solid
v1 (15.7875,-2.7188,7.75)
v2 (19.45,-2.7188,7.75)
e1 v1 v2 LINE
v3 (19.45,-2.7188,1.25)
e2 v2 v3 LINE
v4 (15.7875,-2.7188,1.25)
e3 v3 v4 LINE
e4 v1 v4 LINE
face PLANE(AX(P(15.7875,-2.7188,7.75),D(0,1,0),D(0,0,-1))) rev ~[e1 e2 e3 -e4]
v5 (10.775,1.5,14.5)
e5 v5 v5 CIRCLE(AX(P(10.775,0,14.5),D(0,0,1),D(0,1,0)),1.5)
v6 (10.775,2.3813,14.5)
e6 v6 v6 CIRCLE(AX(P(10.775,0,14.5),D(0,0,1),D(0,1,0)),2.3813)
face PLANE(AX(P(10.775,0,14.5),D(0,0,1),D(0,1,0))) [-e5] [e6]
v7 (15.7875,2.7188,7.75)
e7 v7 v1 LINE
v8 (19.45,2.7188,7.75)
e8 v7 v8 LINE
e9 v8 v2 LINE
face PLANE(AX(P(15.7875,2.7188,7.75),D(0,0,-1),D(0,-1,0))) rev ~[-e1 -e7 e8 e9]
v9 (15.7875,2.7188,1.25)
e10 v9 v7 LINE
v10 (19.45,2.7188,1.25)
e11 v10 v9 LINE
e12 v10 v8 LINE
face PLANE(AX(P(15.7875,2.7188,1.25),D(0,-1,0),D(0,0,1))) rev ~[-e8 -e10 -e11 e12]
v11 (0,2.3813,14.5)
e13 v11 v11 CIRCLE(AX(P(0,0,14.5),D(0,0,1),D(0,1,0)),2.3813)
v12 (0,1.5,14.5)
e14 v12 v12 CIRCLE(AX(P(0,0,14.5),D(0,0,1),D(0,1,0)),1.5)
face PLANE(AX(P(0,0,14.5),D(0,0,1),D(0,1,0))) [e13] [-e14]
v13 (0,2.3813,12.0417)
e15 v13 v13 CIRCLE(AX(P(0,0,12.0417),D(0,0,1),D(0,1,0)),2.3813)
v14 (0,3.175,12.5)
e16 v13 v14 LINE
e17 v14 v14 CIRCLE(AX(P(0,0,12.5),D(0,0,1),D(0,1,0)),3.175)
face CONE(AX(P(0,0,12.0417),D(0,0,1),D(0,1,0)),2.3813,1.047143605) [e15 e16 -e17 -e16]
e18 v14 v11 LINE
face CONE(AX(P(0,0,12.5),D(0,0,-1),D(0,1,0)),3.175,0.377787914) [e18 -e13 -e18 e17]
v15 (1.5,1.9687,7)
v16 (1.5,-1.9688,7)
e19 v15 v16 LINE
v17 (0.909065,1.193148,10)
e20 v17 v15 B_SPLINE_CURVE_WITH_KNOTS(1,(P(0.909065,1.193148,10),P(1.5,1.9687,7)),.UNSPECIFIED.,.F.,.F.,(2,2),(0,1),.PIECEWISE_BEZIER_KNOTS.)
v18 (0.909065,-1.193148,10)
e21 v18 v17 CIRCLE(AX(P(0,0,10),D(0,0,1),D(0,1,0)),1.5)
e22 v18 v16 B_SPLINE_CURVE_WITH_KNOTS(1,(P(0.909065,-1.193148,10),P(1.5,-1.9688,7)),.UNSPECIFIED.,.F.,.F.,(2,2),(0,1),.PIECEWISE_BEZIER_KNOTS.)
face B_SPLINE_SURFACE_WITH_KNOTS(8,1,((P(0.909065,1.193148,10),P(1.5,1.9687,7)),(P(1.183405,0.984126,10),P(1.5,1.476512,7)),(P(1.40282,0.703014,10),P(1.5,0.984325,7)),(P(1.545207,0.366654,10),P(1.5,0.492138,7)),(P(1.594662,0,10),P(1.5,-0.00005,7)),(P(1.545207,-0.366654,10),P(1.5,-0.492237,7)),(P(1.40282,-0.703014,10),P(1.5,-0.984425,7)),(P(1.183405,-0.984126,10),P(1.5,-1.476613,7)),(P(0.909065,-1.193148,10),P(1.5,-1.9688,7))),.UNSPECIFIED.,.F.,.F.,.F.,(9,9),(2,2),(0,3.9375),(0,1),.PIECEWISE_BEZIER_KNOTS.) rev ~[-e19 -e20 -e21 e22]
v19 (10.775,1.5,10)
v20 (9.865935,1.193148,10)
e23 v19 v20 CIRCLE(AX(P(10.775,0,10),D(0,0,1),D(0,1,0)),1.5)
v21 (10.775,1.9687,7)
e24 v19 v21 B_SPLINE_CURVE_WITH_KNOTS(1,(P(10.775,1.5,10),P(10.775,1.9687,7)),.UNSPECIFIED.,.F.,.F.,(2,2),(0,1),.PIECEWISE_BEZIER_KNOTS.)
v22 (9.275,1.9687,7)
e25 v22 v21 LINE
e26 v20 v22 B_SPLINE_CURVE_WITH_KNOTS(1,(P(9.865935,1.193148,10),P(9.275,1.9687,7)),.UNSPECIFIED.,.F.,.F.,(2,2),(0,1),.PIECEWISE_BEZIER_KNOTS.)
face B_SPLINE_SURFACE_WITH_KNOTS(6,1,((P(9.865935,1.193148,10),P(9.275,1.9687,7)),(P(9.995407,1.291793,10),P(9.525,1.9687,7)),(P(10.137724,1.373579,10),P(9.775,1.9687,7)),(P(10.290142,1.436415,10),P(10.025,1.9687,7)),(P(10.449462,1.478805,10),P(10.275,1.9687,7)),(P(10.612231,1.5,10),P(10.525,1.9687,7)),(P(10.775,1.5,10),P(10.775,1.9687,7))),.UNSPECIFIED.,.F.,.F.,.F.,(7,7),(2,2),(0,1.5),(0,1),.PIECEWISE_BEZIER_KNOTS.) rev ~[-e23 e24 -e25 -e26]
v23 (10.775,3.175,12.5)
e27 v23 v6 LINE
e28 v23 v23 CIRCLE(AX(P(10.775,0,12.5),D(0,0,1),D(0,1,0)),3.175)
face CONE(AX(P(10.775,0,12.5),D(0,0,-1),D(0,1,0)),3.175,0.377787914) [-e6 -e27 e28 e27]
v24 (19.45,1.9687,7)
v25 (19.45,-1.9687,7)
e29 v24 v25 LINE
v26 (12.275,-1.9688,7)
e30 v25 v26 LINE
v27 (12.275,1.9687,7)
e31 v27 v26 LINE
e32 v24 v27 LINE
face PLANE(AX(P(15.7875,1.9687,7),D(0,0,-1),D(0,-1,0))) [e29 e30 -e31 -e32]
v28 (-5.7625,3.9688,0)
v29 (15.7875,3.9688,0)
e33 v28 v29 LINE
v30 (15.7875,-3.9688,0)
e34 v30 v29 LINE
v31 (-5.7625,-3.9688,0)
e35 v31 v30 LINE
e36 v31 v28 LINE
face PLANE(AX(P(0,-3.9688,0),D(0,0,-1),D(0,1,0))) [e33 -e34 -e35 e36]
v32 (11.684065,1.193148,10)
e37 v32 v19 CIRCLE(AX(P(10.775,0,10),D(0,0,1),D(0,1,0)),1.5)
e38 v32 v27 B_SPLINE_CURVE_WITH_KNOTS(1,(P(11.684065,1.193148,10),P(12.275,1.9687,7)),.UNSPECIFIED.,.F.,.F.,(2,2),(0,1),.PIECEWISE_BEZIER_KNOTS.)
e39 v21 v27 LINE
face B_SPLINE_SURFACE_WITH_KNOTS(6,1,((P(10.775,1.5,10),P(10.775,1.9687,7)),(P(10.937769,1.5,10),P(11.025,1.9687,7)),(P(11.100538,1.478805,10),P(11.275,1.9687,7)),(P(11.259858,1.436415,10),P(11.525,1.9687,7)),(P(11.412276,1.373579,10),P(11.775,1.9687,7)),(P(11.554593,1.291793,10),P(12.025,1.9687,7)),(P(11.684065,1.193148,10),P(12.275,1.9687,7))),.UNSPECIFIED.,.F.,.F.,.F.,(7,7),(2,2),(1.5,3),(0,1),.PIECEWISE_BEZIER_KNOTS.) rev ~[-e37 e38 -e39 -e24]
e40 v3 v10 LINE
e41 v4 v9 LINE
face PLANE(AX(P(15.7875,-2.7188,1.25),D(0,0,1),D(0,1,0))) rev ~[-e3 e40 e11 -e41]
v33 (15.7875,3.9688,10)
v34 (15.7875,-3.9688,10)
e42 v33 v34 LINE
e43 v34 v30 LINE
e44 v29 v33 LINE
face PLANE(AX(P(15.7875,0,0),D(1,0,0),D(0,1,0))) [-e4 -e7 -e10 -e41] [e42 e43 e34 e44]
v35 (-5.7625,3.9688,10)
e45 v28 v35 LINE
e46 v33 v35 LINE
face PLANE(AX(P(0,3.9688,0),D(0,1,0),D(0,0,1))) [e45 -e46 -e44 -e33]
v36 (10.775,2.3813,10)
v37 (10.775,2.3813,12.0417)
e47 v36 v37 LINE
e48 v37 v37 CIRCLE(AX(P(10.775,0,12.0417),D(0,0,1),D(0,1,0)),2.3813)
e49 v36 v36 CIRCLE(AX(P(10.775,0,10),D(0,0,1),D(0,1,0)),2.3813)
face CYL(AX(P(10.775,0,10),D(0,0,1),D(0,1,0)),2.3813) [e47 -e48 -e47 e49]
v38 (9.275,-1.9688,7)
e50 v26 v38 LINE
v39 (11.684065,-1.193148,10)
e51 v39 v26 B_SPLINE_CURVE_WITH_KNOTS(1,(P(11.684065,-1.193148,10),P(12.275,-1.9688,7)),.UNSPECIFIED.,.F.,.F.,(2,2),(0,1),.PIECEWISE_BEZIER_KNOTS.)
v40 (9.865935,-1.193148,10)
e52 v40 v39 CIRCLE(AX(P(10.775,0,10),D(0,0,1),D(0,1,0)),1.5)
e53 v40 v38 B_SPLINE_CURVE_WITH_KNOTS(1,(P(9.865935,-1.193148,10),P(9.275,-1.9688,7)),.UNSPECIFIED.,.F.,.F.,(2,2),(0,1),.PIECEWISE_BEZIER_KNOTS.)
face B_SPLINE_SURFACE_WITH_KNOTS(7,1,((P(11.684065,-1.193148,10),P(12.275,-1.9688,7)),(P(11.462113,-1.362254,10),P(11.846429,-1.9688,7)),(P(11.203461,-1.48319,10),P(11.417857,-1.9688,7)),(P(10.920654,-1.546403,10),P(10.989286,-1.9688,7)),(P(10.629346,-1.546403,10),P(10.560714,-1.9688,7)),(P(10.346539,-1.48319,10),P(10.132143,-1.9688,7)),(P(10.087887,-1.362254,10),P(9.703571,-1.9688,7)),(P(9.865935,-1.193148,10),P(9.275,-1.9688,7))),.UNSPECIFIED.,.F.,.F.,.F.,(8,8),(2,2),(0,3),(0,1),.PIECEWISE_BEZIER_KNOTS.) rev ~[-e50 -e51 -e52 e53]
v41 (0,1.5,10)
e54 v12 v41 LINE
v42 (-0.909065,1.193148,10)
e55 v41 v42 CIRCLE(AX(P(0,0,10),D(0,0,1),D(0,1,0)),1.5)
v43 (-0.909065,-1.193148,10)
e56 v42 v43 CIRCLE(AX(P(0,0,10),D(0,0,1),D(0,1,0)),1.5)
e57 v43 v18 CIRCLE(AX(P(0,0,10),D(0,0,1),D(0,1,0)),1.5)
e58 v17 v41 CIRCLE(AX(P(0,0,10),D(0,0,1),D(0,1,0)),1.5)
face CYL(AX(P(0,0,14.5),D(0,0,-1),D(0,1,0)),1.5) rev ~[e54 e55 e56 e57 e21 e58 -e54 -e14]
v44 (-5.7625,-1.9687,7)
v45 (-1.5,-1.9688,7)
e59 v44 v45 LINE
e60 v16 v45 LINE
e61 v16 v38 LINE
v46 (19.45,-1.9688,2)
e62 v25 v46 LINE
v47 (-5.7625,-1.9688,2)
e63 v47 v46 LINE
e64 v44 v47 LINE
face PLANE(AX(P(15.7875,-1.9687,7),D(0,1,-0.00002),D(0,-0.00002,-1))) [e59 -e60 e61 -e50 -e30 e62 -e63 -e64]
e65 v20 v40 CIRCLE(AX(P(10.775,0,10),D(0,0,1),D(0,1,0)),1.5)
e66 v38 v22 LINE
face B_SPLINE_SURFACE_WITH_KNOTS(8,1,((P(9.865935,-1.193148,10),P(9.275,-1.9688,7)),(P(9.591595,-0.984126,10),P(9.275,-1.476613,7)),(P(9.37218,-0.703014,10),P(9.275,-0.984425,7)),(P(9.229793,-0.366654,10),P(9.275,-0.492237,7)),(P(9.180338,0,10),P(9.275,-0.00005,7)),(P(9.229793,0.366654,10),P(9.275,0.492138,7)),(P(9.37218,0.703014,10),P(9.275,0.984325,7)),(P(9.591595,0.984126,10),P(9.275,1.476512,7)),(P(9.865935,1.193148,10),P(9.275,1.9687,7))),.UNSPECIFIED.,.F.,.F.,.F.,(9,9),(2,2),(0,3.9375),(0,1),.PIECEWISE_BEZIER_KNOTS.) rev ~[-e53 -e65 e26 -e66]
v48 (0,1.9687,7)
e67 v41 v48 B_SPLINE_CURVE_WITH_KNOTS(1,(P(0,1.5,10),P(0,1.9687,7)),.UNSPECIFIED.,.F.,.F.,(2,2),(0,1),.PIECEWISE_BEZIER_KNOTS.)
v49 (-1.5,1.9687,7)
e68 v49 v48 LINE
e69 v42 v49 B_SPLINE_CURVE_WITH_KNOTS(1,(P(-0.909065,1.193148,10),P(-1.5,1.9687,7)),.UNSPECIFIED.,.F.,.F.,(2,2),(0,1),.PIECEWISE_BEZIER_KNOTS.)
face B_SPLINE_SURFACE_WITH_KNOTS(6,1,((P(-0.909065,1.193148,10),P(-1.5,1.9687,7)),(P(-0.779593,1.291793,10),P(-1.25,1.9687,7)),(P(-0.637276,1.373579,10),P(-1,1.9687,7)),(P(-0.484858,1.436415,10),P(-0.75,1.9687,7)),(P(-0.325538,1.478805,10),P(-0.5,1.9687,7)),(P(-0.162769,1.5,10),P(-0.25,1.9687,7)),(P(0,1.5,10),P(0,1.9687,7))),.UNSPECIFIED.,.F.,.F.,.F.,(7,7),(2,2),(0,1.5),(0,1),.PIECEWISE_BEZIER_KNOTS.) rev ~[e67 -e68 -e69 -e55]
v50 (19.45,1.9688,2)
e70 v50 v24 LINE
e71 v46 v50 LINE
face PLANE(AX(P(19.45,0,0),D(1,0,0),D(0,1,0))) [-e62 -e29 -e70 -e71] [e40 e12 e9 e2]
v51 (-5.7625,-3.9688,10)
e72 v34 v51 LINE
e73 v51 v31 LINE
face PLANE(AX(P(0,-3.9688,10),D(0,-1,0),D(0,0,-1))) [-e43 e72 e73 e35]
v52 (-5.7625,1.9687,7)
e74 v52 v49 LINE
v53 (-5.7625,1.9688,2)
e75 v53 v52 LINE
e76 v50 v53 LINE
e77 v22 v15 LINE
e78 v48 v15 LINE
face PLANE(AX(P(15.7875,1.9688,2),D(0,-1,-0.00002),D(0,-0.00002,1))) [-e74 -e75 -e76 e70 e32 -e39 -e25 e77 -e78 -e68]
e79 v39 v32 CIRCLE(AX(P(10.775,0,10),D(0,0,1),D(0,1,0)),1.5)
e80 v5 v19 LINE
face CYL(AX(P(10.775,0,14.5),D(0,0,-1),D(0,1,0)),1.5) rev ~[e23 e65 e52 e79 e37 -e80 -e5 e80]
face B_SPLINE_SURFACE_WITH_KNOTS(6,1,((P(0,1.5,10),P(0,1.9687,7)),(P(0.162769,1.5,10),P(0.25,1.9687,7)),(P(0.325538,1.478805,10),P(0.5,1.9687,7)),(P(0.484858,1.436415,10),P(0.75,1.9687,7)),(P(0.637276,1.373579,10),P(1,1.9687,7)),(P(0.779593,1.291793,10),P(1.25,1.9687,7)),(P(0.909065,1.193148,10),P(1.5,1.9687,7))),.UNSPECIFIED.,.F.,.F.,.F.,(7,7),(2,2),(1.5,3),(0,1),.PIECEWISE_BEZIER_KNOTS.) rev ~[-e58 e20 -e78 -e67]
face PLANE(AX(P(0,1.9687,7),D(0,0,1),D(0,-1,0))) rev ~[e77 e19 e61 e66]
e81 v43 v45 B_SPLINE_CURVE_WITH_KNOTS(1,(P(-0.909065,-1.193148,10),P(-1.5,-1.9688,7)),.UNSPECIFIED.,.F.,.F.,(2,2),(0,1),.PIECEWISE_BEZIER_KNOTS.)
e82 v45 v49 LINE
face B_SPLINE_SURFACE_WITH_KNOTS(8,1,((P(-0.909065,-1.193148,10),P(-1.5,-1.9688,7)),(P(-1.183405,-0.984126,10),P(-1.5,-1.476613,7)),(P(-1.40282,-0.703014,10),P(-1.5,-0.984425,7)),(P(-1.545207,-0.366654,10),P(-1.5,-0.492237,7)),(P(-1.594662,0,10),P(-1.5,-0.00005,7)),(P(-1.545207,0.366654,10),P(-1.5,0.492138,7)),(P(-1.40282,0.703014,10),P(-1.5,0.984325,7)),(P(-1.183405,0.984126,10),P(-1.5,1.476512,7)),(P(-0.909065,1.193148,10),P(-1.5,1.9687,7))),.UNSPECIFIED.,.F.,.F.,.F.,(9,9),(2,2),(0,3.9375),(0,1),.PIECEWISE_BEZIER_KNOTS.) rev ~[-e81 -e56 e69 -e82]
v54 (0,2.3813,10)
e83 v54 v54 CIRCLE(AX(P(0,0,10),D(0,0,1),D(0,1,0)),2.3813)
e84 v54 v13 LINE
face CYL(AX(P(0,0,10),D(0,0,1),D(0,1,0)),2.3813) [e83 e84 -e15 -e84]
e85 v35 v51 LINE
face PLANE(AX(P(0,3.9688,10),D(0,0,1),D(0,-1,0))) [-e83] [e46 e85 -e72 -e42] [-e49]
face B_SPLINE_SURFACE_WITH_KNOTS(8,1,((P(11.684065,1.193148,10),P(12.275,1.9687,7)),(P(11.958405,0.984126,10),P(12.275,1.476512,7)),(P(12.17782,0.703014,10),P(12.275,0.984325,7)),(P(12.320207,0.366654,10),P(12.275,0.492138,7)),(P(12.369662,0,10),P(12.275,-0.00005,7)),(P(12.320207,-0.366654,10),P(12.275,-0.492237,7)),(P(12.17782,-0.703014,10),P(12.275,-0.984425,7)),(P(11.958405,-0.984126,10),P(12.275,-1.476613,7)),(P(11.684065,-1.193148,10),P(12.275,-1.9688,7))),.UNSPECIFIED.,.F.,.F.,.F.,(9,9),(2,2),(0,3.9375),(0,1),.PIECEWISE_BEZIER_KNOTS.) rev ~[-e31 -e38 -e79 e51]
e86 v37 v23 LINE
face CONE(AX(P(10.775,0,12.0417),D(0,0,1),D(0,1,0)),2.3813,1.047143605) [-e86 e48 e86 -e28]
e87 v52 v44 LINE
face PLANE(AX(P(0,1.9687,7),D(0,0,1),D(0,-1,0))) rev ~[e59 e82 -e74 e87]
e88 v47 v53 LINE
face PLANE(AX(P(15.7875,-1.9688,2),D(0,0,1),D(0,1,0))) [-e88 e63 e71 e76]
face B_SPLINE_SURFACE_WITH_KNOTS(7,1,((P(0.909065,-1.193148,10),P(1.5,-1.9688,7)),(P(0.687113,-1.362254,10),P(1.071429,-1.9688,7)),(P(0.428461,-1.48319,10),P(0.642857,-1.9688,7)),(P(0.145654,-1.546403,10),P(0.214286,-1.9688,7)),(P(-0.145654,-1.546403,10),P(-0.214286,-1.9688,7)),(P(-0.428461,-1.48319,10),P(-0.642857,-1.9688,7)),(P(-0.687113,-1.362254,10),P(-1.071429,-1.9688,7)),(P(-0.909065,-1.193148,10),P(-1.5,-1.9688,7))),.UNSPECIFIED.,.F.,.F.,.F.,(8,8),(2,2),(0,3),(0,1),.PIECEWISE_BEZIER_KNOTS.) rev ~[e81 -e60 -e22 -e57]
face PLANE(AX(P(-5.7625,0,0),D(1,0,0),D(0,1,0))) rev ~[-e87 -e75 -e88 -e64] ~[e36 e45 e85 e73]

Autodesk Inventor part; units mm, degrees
ref_plane "Start Plane" through (-5.7625, 0, 0) normal (1, 0, 0) x (0, 1, 0)
ref_plane "End Plane" through (15.7875, 0, 0) normal (1, 0, 0) x (0, 1, 0)
sketch "Box Sketch" plane through (0, 0, 0) normal (1, 0, 0) x (0, 1, 0)
  line L0 (-3.9688, 0) -> (3.9688, 0)
  line L1 (3.9688, 0) -> (3.9688, 10)
  line L2 (3.9688, 10) -> (-3.9688, 10)
  line L3 (-3.9688, 10) -> (-3.9688, 0)
  line L4 (-1.9688, 2) -> (1.9688, 2)
  line L5 (1.9688, 2) -> (1.9687, 7)
  line L6 (1.9687, 7) -> (-1.9687, 7)
  line L7 (-1.9687, 7) -> (-1.9688, 2)
  line L8 (1.9688, 2) -> (3.9688, 2) construction
  line L9 (-1.9688, 2) -> (-3.9688, 2) construction
  line L10 (-1.9688, 2) -> (-1.9688, 0) construction
  line L11 (2.7188, 1.25) -> (2.7188, 7.75)
  line L12 (2.7188, 7.75) -> (-2.7188, 7.75)
  line L13 (-2.7188, 7.75) -> (-2.7188, 1.25)
  line L14 (-2.7188, 1.25) -> (2.7188, 1.25)
  line L15 (-1.9687, 7) -> (-2.7188, 7) construction
  line L16 (1.9687, 7) -> (2.7188, 7) construction
  line L17 (1.9688, 2) -> (1.9687, 1.25) construction
  line L18 (-1.9687, 7) -> (-1.9687, 7.75) construction
  line L19 (-2.8688, 7.9) -> (2.8688, 7.9)
  line L20 (2.8688, 7.9) -> (2.8688, 1.1)
  line L21 (2.8688, 1.1) -> (-2.8688, 1.1)
  line L22 (-2.8688, 1.1) -> (-2.8688, 7.9)
  point P0 (0, 0)
  point P1 (0, 0)
  dimension "boxHeight" = 7.9375
  dimension "boxWidth" = 10
  dimension "frontWallThick" = 3
  dimension "sideWallThick" = 2
  dimension "connectorTol" = 0.15
  dimension "d24" = 0.75
sketch "Fitting Sketch" plane through (0, 0, 0) normal (1, 0, 0) x (0, 1, 0)
  line L0 (0, 10) -> (0, 14.5) construction
  line L1 (2.3813, 10) -> (2.3813, 12.0417)
  line L2 (2.3813, 12.0417) -> (3.175, 12.5)
  line L3 (3.175, 12.5) -> (2.3813, 14.5)
  line L4 (2.3813, 14.5) -> (1.5, 14.5)
  line L5 (1.5, 14.5) -> (1.5, 10)
  line L6 (1.5, 10) -> (2.3813, 10)
  point P0 (0, 0)
  dimension "d2" = 3
  dimension "d3" = 2
  dimension "d4" = 60
  dimension "d5" = 2.5
  dimension "d6" = 4.7625
  dimension "d7" = 6.35
  dimension "d9" = 10
revolve "Fitting" add sketch "Fitting Sketch" angle 360 about axis through (0, 0, 10) along (0, 0, 1)
extrude "Box" add sketch "Box Sketch" along normal mid plane 11.525 contours L3 L2 L1 L0 | L14 L13 L12 L11 | L19 L20 L21 L22
ref_plane "Loft Start Plane" through (0, 0, 7) normal (0, 0, 1) x (1, 0, 0)
sketch "Loft Sketch" plane through (0, 0, 7) normal (0, 0, 1) x (1, 0, 0)
  line L0 (1.5, -1.9688) -> (-1.5, -1.9688)
  line L1 (-1.5, -1.9688) -> (-1.5, 1.9687)
  line L2 (-1.5, 1.9687) -> (1.5, 1.9687)
  line L3 (1.5, 1.9687) -> (1.5, -1.9688)
  line L4 (1.5, -1.9688) -> (-1.5, 1.9687) construction
  line L5 (-1.5, -1.9688) -> (1.5, 1.9687) construction
  point P0 (0, 0)
  dimension "d17" = 3
  dimension "d18" = 3.9375
loft "Loft" cut profiles "Loft Sketch" section 1 edges at (0, -1.5, 10)
pattern_linear "Channel Repetition" count 2 spacing 10.775 along (1, 0, 0)
extrude "Clip Extra Length" cut sketch "Box Sketch" along normal blind 19.45 from surface at 15.7875 contours L3 L2 L1 L0 | L19 L20 L21 L22
extrude "Connector" add sketch "Box Sketch" along normal blind 3.6625 from surface at 15.7875 contours L14 L13 L12 L11
equation "\"boxHeight\" = fittingBarbOD + 2 * siliconeThick"
equation "\"boxWidth\" = manifoldWidth"
equation "\"d2\" = fittingID"
equation "\"d3\" = fittingBarbLength"
equation "\"d4\" = fittingBarbBaseAngle"
equation "\"d5\" = fittingNeckLength"
equation "\"d6\" = fittingOD"
equation "\"d7\" = fittingBarbOD"
equation "\"d9\" = boxWidth"
equation "\"d14\" = blockWidth"
equation "\"d27\" = chanWidth"
equation "\"d17\" = fittingID"
equation "\"d18\" = boxHeight - 2 * sideWallThick"
equation "\"d16\" = boxWidth - frontWallThick"
equation "\"d29\" = -0.5 * blockWidth"
equation "\"fittingBarbOD\" = 6.35"
equation "\"siliconeThick\" = 0.79375"
equation "\"manifoldWidth\" = 10"
equation "\"fittingID\" = 3"
equation "\"fittingBarbLength\" = 2"
equation "\"fittingBarbBaseAngle\" = 60deg"
equation "\"fittingNeckLength\" = 2.5"
equation "\"fittingOD\" = 4.7625"
equation "\"blockWidth\" = 11.525"
equation "\"chanWidth\" = 10.775"
properties part number "manifold_lower" material "PLA (Blue-glowing, 3D Printed)"
